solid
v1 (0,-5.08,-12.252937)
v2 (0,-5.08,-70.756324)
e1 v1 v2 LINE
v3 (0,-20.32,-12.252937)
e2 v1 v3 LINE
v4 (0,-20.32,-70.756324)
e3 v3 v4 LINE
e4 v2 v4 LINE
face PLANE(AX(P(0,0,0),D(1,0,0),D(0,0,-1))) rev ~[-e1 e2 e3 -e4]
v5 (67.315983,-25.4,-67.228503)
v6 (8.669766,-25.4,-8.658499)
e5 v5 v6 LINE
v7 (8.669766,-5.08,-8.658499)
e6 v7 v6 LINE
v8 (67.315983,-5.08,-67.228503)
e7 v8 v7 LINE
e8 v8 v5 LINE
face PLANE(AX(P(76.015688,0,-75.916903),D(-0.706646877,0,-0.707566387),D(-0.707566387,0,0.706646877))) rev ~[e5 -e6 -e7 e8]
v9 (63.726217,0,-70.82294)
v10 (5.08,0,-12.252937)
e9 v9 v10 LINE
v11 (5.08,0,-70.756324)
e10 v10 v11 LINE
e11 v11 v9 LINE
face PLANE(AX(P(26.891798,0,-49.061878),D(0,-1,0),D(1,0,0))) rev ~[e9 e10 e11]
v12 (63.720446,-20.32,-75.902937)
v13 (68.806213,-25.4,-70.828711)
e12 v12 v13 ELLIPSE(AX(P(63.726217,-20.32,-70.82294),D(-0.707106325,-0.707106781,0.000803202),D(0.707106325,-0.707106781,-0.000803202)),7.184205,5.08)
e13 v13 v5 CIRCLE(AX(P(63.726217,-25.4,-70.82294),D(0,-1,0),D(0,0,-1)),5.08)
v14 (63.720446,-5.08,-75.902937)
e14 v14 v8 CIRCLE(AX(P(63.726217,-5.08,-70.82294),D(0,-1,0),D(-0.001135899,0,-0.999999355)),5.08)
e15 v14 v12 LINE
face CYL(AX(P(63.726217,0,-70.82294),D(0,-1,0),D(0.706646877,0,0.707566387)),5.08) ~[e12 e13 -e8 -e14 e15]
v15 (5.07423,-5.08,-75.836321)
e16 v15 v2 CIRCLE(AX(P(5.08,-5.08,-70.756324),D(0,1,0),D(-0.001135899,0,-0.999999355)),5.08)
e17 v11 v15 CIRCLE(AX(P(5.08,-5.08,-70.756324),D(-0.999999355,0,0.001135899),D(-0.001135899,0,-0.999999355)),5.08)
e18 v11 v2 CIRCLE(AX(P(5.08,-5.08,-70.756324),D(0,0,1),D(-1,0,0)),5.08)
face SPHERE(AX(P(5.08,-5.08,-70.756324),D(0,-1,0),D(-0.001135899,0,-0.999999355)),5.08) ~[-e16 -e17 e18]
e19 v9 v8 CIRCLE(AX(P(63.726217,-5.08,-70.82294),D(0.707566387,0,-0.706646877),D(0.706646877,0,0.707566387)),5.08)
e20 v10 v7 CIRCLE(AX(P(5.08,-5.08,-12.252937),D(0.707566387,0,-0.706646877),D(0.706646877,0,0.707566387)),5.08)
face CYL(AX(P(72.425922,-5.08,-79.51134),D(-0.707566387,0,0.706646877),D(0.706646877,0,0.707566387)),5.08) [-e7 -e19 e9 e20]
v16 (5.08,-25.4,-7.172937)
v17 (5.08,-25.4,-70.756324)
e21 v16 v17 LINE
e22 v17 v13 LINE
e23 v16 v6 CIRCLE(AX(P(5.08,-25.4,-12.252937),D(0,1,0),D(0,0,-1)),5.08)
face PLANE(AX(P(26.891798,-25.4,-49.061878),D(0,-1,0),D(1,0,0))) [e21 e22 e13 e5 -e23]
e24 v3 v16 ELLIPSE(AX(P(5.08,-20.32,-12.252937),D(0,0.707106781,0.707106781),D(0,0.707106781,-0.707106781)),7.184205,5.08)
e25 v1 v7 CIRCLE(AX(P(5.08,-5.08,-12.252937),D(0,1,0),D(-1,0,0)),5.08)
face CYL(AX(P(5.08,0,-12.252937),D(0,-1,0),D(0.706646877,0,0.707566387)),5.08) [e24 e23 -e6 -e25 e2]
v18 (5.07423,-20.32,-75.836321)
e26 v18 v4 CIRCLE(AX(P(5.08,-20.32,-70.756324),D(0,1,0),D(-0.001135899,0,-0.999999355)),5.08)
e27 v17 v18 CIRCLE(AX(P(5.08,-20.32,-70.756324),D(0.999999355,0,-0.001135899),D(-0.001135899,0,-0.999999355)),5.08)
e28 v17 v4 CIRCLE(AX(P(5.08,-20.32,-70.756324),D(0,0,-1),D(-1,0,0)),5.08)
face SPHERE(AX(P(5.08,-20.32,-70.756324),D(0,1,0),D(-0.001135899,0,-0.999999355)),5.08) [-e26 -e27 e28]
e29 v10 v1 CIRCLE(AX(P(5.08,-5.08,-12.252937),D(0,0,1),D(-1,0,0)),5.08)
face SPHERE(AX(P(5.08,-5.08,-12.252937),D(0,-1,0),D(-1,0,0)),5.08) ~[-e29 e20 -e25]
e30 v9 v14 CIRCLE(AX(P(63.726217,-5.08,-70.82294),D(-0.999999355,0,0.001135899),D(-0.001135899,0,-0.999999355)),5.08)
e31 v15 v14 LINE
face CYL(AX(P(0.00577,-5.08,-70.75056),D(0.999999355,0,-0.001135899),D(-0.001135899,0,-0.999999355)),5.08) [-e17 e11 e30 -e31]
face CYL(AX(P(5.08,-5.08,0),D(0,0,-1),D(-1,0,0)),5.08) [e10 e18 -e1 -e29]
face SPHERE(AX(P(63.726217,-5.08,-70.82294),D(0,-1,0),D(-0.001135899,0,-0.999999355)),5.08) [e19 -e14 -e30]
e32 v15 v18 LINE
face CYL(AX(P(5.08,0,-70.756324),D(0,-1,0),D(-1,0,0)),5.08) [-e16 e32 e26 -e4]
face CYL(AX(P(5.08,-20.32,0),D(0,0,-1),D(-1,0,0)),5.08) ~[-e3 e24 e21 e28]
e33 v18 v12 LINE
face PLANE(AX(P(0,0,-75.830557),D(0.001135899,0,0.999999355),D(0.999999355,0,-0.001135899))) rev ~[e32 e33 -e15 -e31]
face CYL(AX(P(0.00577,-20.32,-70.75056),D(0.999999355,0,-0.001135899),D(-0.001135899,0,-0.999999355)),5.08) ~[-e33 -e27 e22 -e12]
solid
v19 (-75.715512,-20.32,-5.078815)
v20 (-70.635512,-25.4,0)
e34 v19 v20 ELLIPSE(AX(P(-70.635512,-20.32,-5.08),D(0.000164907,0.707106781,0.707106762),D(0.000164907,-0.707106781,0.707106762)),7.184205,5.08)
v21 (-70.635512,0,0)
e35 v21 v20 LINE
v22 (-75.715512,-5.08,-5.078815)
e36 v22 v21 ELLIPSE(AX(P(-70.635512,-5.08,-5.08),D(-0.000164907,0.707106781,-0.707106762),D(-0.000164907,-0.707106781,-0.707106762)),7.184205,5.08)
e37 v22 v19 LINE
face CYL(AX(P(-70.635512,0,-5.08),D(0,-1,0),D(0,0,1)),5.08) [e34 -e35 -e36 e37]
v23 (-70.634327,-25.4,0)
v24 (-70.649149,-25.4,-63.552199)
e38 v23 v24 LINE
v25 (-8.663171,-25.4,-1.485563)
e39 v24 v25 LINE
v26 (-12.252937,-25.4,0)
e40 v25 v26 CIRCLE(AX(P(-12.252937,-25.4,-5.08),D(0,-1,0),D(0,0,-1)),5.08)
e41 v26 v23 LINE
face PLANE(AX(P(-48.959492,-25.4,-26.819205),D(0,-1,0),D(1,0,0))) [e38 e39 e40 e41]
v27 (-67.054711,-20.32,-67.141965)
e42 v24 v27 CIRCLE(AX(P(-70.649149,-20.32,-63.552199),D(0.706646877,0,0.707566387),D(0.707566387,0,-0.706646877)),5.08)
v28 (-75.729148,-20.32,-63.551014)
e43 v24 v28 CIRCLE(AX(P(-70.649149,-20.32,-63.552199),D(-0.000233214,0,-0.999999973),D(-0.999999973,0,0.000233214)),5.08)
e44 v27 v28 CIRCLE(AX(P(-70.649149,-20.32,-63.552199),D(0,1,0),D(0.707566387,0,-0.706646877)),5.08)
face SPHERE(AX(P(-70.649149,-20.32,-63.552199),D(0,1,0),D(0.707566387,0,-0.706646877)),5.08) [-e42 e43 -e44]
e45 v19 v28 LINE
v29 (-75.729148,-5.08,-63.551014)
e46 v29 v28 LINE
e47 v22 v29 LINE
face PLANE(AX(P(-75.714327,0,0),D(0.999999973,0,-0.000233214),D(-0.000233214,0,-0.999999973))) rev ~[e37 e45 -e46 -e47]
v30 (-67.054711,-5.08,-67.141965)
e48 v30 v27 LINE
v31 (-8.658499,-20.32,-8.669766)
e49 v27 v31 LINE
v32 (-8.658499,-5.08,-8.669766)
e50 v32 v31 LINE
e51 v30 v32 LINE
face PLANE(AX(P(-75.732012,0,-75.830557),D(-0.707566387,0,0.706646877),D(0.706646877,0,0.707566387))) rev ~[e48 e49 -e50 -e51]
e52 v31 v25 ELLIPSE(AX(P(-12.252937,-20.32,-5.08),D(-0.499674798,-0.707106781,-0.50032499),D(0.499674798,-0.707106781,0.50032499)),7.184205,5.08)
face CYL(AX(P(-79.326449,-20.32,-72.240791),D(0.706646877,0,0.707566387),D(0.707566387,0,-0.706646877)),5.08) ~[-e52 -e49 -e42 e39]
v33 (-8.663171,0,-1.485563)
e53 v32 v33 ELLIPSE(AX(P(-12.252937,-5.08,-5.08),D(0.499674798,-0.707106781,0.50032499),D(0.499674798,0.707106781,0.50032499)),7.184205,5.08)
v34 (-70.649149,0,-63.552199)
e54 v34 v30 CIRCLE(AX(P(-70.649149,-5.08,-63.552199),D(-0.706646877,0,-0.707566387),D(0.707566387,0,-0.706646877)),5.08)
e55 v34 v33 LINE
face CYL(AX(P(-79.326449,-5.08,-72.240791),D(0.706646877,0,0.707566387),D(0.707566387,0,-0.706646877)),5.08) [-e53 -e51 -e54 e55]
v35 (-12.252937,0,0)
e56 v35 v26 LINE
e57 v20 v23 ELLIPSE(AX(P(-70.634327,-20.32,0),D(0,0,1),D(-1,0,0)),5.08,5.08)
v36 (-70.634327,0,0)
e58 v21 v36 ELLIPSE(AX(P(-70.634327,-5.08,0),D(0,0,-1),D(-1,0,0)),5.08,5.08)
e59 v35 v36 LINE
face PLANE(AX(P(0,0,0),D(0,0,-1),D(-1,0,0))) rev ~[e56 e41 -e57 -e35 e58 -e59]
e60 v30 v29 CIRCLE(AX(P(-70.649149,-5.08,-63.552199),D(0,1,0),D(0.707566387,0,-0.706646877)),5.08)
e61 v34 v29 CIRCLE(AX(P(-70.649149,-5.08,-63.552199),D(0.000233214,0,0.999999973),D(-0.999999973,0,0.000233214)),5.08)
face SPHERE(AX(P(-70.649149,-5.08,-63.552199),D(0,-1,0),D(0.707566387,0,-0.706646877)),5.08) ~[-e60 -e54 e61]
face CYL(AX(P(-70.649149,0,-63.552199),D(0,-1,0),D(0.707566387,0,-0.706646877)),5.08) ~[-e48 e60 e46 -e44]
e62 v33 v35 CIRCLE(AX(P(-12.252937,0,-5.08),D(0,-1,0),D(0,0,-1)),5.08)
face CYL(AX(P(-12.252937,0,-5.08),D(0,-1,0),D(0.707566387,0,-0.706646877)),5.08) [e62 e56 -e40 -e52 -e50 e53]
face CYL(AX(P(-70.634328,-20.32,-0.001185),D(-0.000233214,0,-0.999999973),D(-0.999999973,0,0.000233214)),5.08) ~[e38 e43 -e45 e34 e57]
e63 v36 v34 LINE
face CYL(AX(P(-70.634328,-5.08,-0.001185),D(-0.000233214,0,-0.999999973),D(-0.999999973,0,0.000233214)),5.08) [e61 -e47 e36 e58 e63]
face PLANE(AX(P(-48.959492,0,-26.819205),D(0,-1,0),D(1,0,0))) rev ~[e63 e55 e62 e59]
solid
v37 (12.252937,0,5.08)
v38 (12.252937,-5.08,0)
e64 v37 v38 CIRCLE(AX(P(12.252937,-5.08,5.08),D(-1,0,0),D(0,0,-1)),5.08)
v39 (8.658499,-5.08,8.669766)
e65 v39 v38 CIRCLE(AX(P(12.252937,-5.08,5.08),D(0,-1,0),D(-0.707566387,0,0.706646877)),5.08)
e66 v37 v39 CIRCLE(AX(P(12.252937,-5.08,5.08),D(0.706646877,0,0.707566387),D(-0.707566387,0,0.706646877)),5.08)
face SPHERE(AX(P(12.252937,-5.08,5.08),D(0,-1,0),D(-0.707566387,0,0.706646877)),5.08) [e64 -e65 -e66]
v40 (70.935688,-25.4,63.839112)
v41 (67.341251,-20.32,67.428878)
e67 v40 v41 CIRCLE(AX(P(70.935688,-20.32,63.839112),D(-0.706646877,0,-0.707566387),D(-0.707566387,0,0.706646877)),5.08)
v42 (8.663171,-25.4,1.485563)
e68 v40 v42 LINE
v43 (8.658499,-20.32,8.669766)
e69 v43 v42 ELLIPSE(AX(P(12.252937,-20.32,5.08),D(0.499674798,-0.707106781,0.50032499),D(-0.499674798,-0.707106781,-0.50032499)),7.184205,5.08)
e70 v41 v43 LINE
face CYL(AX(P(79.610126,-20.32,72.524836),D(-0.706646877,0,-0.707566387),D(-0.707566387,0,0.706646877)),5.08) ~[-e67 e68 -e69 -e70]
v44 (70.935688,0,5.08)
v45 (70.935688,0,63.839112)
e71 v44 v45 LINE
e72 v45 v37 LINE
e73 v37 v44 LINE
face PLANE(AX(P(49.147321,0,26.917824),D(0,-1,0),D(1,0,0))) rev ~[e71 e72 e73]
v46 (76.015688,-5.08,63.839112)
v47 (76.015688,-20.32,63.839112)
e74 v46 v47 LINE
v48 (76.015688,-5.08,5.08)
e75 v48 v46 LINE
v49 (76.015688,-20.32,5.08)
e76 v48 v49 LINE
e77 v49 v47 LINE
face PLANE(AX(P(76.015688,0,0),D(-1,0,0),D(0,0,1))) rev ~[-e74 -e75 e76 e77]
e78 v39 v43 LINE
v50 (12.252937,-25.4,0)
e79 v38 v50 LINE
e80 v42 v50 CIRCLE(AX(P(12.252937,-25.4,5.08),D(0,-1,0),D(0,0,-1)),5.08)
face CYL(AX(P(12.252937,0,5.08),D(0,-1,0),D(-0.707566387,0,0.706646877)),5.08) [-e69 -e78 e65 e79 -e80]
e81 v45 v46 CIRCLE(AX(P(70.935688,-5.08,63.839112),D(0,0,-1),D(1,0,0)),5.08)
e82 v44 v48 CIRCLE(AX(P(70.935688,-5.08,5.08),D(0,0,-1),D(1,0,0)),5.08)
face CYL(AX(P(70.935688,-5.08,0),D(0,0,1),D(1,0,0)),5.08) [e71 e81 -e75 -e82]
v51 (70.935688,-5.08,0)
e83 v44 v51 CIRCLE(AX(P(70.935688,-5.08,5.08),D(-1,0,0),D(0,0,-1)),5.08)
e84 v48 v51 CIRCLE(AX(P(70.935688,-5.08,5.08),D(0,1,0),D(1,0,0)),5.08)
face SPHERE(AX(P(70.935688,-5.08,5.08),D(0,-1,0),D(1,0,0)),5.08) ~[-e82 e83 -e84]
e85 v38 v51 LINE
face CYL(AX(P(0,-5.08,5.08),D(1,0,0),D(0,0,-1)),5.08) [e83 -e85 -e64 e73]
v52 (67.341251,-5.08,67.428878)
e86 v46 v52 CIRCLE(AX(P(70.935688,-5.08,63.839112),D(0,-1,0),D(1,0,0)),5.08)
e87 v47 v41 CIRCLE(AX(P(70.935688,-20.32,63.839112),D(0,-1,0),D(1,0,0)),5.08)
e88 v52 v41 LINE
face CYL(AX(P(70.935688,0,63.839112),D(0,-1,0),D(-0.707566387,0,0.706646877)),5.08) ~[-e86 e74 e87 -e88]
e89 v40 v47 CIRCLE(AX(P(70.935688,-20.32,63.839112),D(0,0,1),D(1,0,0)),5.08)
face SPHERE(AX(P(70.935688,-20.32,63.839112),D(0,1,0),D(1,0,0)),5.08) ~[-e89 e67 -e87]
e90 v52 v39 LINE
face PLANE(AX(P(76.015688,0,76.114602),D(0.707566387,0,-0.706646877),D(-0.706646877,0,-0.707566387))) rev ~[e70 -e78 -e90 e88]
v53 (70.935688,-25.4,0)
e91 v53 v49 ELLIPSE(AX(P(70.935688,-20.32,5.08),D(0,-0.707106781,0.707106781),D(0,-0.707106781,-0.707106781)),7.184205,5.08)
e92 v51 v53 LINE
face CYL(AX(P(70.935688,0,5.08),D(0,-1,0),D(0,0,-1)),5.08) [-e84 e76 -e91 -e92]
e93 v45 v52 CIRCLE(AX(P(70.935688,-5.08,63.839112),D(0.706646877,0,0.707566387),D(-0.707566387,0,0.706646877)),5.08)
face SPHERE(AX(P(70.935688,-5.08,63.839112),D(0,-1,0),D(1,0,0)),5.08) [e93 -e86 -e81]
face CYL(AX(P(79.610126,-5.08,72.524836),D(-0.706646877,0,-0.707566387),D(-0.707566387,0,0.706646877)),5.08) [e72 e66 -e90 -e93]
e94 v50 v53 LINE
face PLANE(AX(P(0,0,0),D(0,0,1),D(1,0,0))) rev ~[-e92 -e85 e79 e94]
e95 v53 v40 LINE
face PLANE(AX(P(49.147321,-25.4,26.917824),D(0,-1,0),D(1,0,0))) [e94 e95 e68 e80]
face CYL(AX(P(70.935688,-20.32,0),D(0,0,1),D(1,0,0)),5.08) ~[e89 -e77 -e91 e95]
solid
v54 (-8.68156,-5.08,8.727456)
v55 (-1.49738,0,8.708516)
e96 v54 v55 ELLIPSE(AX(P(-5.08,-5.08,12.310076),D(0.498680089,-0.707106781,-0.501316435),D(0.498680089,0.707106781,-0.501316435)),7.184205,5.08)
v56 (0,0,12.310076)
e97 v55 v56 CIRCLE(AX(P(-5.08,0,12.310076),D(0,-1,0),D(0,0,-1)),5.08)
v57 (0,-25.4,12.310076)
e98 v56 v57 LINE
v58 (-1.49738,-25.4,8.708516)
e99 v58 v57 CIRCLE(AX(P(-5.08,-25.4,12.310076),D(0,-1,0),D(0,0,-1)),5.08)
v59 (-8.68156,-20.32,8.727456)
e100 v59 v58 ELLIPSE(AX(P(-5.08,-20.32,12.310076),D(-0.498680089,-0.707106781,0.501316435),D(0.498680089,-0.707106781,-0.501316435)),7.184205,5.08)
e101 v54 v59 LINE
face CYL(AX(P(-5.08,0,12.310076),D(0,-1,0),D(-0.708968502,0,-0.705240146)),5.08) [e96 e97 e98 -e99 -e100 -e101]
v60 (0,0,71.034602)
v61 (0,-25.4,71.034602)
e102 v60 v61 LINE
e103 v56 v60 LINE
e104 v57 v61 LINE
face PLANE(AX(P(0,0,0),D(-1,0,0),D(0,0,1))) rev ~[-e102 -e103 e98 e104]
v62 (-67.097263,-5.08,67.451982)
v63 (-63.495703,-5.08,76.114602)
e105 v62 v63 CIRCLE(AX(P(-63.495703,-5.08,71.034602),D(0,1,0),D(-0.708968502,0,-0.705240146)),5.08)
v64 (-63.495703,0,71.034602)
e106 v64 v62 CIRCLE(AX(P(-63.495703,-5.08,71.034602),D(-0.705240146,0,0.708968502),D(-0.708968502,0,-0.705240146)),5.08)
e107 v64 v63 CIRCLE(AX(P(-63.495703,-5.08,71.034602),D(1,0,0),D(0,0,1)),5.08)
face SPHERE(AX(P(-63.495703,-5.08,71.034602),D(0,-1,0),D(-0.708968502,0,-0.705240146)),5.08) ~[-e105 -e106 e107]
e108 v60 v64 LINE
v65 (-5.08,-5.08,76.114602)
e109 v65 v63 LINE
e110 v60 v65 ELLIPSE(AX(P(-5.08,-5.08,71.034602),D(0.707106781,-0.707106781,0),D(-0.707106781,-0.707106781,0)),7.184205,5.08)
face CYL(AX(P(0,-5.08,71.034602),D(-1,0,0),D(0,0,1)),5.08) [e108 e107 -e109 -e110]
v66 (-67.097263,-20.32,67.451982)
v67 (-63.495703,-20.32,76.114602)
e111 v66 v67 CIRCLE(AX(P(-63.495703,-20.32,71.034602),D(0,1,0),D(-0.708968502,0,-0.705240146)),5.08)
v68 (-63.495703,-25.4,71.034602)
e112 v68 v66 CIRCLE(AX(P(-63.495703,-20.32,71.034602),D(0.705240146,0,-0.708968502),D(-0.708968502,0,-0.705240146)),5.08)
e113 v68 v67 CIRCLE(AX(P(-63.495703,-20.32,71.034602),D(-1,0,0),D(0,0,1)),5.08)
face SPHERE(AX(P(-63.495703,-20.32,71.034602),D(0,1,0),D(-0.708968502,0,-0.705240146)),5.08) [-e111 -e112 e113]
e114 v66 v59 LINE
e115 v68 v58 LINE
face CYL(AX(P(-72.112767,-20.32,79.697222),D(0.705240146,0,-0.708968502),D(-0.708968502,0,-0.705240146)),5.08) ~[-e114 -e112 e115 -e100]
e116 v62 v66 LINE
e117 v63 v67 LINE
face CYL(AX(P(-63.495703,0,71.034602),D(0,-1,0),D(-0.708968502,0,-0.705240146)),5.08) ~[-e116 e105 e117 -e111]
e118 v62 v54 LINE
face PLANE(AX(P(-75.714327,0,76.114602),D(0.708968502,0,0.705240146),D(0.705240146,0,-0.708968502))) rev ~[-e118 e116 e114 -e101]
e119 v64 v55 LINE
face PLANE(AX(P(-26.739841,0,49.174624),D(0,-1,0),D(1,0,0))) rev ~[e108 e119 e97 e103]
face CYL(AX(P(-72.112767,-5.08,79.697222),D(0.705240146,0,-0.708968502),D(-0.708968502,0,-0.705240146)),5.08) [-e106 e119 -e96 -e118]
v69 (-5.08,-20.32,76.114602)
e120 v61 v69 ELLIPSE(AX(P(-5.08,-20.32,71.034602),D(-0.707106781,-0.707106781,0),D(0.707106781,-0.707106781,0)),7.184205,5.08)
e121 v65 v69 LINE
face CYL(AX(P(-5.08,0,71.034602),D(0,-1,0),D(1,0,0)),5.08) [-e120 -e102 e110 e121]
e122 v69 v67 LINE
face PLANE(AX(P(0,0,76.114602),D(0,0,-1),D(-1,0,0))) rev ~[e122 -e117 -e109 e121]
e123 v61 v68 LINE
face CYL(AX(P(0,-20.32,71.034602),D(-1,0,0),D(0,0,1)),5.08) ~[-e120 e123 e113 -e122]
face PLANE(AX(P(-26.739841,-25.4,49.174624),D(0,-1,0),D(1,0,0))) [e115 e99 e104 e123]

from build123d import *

# Parameters (mm, degrees)
F1_DEPTH = 25.4
F2_R     = 5.08
F2_2_R   = 5.08
F2_3_R   = 5.08
F2_4_R   = 5.08


with BuildPart() as f1:
    # F0 (on Front) → F1 (new body)
    with BuildSketch(Plane.XZ):
        Polygon((76.0156884789, -75.9169031134), (0, 0), (0, -75.8305569174), align=None)
    extrude(amount=F1_DEPTH)

    # F2
    f2_edges = [f1.edges().sort_by_distance(p)[0] for p in [
        (0, -12.7, -75.830557),
        (76.015688, -12.7, -75.916903),
        (38.007844, 0, -75.87373),
        (38.007844, -25.4, -75.87373),
        (0, 0, -37.915278),
        (0, -25.4, -37.915278),
        (38.007844, 0, -37.958452),
        (0, -12.7, 0),
    ]]
    fillet(f2_edges, radius=F2_R)


with BuildPart() as f1b:
    # F0 (on Front) → F1, piece 2 (new body)
    with BuildSketch(Plane.XZ):
        Polygon((-75.714327395, 76.114602387), (0, 0), (0, 76.114602387), align=None)
    extrude(amount=F1_DEPTH)

    # F2#2
    f2_2_edges = [f1b.edges().sort_by_distance(p)[0] for p in [
        (-75.714327, -12.7, 76.114602),
        (-37.857164, 0, 38.057301),
        (-37.857164, -25.4, 38.057301),
        (0, -12.7, 76.114602),
        (-37.857164, 0, 76.114602),
        (-37.857164, -25.4, 76.114602),
        (0, -12.7, 0),
    ]]
    fillet(f2_2_edges, radius=F2_2_R)


with BuildPart() as f1c:
    # F0 (on Front) → F1, piece 3 (new body)
    with BuildSketch(Plane.XZ):
        Polygon((76.0156884789, 76.114602387), (0, 0), (76.0156884789, 0), align=None)
    extrude(amount=F1_DEPTH)

    # F2#3
    f2_3_edges = [f1c.edges().sort_by_distance(p)[0] for p in [
        (76.015688, -12.7, 0),
        (76.015688, -12.7, 76.114602),
        (76.015688, 0, 38.057301),
        (76.015688, -25.4, 38.057301),
        (38.007844, 0, 0),
        (0, -12.7, 0),
        (38.007844, 0, 38.057301),
        (38.007844, -25.4, 38.057301),
    ]]
    fillet(f2_3_edges, radius=F2_3_R)


with BuildPart() as f1d:
    # F0 (on Front) → F1, piece 4 (new body)
    with BuildSketch(Plane.XZ):
        Polygon((-75.7320121376, -75.8305569174), (0, 0), (-75.714327395, 0), align=None)
    extrude(amount=F1_DEPTH)

    # F2#4
    f2_4_edges = [f1d.edges().sort_by_distance(p)[0] for p in [
        (0, -12.7, 0),
        (-75.732012, -12.7, -75.830557),
        (-37.866006, 0, -37.915278),
        (-37.866006, -25.4, -37.915278),
        (-75.714327, -12.7, 0),
        (-75.72317, 0, -37.915278),
        (-75.72317, -25.4, -37.915278),
    ]]
    fillet(f2_4_edges, radius=F2_4_R)


solid = Compound([f1.part, f1b.part, f1c.part, f1d.part])
